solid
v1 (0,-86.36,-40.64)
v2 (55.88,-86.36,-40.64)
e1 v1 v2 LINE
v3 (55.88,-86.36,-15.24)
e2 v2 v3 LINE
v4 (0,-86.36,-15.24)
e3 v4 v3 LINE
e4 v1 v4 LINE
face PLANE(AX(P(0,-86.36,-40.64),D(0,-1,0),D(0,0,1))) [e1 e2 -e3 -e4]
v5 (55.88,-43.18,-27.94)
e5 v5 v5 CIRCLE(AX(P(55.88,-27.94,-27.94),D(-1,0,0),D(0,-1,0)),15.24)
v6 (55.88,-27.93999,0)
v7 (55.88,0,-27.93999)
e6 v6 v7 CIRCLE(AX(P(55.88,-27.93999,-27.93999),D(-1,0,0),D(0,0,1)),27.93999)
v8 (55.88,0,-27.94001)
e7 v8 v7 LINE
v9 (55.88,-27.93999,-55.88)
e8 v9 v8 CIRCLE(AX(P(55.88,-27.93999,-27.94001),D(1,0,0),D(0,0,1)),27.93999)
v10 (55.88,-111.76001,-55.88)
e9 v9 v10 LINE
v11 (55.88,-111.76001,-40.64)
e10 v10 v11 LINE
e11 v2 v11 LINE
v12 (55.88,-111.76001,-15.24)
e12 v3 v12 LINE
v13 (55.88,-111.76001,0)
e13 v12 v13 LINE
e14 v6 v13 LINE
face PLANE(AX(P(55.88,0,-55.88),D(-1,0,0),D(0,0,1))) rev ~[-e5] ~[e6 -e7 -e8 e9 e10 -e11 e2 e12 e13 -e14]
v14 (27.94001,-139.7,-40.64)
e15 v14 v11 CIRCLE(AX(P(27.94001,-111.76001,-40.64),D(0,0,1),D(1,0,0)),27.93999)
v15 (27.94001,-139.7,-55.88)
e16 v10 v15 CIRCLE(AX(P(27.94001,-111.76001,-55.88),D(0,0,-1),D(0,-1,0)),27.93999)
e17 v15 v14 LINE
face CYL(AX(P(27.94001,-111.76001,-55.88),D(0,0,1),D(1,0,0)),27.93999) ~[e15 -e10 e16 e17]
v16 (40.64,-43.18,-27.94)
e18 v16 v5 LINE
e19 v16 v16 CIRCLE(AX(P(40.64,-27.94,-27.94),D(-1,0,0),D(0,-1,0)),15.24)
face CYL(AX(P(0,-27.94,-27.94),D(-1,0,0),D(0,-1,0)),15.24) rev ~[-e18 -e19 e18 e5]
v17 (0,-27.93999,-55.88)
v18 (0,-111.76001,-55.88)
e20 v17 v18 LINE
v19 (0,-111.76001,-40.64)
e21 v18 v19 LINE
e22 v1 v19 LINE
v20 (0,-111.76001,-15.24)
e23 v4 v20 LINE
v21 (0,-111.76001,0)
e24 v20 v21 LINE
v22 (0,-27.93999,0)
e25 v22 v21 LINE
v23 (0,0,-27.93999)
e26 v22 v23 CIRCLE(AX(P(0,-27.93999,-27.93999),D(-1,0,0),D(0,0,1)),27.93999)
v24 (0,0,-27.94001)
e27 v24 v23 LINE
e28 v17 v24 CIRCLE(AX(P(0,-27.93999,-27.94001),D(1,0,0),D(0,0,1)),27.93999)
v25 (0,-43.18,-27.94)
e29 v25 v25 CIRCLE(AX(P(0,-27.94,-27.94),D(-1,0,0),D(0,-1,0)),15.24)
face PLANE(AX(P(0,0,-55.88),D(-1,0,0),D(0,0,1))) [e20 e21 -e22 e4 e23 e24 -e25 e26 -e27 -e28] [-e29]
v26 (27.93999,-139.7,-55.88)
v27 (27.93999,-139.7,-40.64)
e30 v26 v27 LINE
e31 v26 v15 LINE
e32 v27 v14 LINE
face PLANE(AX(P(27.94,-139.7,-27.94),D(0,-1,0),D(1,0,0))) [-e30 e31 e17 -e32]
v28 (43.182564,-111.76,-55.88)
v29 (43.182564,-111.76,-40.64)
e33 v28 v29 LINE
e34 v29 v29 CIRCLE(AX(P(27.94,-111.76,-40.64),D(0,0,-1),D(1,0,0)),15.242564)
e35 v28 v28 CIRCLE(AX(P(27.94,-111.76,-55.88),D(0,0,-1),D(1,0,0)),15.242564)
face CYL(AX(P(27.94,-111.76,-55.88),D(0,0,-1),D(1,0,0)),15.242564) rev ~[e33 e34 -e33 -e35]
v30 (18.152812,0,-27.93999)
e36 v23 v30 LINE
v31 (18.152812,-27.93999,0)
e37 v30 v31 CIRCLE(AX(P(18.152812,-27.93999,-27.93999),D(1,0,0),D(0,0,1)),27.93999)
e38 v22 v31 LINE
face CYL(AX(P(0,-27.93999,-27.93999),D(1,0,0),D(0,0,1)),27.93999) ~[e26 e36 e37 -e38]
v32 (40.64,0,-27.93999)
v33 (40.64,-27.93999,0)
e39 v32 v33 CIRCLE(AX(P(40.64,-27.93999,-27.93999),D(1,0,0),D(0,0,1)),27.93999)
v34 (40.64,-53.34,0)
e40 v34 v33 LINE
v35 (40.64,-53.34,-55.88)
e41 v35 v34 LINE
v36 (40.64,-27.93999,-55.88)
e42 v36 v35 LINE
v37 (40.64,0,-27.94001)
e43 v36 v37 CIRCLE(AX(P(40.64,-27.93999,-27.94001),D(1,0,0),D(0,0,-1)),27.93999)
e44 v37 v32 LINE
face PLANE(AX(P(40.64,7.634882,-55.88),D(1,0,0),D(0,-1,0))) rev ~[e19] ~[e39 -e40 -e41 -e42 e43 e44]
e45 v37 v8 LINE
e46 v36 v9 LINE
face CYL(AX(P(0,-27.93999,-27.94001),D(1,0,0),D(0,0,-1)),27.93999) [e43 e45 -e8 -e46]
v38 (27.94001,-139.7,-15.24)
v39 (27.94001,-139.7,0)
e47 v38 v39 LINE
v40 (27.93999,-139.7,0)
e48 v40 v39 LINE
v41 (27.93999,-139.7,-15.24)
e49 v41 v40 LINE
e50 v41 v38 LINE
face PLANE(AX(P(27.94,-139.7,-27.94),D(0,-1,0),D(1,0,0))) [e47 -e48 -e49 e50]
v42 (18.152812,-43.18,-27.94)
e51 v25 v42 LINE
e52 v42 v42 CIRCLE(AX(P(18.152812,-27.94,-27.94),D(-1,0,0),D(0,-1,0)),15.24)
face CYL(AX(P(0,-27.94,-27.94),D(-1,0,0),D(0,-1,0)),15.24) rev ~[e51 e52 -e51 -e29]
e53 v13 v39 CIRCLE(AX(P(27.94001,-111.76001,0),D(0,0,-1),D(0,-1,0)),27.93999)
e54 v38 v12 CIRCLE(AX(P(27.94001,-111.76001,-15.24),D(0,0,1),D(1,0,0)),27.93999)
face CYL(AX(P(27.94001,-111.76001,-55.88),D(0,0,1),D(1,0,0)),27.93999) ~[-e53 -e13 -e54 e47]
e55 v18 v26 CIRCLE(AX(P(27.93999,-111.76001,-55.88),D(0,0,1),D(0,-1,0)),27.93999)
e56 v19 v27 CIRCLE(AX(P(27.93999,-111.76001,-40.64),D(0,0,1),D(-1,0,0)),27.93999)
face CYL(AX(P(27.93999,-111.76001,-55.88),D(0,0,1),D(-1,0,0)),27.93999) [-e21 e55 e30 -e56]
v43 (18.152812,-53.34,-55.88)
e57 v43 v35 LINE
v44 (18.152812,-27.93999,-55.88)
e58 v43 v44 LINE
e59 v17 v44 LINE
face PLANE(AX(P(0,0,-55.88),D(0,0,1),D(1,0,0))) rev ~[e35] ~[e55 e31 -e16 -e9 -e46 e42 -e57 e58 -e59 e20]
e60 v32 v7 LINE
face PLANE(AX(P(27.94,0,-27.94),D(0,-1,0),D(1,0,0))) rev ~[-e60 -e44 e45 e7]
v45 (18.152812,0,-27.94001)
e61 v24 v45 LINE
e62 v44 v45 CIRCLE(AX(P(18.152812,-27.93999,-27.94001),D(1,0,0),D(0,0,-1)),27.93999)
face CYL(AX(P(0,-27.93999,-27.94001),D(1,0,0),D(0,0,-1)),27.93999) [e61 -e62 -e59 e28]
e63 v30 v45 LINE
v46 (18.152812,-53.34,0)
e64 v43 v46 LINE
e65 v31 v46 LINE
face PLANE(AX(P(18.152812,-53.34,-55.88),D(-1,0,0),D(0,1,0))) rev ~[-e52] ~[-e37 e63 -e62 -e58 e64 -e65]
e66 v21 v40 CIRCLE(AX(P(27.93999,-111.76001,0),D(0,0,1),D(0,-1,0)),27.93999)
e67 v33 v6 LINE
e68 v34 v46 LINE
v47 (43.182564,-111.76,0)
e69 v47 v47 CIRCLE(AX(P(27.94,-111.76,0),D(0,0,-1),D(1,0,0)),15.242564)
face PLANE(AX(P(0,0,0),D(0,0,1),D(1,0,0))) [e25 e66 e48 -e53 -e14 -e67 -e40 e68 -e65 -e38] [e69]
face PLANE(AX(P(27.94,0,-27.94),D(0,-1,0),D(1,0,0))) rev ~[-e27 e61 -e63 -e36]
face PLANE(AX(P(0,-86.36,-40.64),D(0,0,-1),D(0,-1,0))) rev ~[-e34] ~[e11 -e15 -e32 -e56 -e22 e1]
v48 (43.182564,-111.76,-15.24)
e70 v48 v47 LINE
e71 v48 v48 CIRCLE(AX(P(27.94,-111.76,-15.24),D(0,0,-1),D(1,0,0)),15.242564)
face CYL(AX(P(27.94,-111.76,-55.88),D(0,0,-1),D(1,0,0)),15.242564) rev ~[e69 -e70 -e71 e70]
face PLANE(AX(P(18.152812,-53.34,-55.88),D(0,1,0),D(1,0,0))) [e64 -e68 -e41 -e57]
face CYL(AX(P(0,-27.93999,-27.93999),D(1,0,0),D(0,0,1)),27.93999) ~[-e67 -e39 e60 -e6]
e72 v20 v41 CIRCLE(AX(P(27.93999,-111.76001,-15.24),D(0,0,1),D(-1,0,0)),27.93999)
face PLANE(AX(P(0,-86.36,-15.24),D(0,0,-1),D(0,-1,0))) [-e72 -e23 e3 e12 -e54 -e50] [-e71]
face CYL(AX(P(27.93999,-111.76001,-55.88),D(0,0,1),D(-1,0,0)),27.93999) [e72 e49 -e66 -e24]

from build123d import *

# Parameters (mm, degrees)
F0_W      = 55.88
F0_H      = 55.88
F1_DEPTH  = 139.7
F2_R      = 27.93999
F3_W      = 22.4871877581
F3_H      = 35.5748719843
F3_H_2    = 25.40001
F4_DEPTH  = 55.881
F5_R      = 15.24
F6_DEPTH  = 55.881
F7_W      = 84.3253175833
F7_H      = 25.4
F8_DEPTH  = 55.881
F9_R      = 15.2425635054
F10_DEPTH = 55.881


# Not quite as in the source:
# - a fillet or chamfer is up to 0.001 mm smaller than in the source, because OpenCascade refuses the exact size
# - a feature names something its author has since deleted; it is built from what else it names


with BuildPart() as f1:
    # F0 (on Front) → F1 (new body)
    with BuildSketch(Plane.XZ):
        with Locations((27.94, -27.94)):
            Rectangle(F0_W, F0_H)
    extrude(amount=F1_DEPTH)

    # F2 (radius 27.94 in the source; OpenCascade refuses exactly that, so slightly less here)
    f2_edges = [f1.edges().sort_by_distance(p)[0] for p in [
        (0, -139.7, -27.94),
        (27.94, 0, 0),
        (27.94, 0, -55.88),
        (55.88, -139.7, -27.94),
    ]]
    fillet(f2_edges, radius=F2_R)

    # F3 (on face) → F4 (cut, through all)
    with BuildSketch(Plane(origin=(0, 0, -55.88), x_dir=(1, 0, 0), z_dir=(0, 0, -1))):
        with Locations((29.396406121, 10.1525540079)):
            Rectangle(F3_W, F3_H)
        with Locations((29.396406121, 40.639995)):
            Rectangle(F3_W, F3_H_2)
    extrude(amount=-F4_DEPTH, mode=Mode.SUBTRACT)

    # F5 (on face) → F6 (cut, through all)
    with BuildSketch(Plane(origin=(0, 0, 0), x_dir=(0, -1, 0), z_dir=(-1, 0, 0))):
        with Locations((27.94, -27.94)):
            Circle(F5_R)
    extrude(amount=-F6_DEPTH, mode=Mode.SUBTRACT)

    # F7 (on face) → F8 (cut, through all)
    with BuildSketch(Plane(origin=(0, 0, 0), x_dir=(0, -1, 0), z_dir=(-1, 0, 0))):
        with Locations((128.5226587916, -27.94)):
            Rectangle(F7_W, F7_H)
    extrude(amount=-F8_DEPTH, mode=Mode.SUBTRACT)

    # F9 (on face) → F10 (cut, through all)
    with BuildSketch(Plane(origin=(0, 0, -55.88), x_dir=(1, 0, 0), z_dir=(0, 0, -1))):
        with Locations((27.94, 111.76)):
            Circle(F9_R)
    extrude(amount=-F10_DEPTH, mode=Mode.SUBTRACT)


solid = f1.part
